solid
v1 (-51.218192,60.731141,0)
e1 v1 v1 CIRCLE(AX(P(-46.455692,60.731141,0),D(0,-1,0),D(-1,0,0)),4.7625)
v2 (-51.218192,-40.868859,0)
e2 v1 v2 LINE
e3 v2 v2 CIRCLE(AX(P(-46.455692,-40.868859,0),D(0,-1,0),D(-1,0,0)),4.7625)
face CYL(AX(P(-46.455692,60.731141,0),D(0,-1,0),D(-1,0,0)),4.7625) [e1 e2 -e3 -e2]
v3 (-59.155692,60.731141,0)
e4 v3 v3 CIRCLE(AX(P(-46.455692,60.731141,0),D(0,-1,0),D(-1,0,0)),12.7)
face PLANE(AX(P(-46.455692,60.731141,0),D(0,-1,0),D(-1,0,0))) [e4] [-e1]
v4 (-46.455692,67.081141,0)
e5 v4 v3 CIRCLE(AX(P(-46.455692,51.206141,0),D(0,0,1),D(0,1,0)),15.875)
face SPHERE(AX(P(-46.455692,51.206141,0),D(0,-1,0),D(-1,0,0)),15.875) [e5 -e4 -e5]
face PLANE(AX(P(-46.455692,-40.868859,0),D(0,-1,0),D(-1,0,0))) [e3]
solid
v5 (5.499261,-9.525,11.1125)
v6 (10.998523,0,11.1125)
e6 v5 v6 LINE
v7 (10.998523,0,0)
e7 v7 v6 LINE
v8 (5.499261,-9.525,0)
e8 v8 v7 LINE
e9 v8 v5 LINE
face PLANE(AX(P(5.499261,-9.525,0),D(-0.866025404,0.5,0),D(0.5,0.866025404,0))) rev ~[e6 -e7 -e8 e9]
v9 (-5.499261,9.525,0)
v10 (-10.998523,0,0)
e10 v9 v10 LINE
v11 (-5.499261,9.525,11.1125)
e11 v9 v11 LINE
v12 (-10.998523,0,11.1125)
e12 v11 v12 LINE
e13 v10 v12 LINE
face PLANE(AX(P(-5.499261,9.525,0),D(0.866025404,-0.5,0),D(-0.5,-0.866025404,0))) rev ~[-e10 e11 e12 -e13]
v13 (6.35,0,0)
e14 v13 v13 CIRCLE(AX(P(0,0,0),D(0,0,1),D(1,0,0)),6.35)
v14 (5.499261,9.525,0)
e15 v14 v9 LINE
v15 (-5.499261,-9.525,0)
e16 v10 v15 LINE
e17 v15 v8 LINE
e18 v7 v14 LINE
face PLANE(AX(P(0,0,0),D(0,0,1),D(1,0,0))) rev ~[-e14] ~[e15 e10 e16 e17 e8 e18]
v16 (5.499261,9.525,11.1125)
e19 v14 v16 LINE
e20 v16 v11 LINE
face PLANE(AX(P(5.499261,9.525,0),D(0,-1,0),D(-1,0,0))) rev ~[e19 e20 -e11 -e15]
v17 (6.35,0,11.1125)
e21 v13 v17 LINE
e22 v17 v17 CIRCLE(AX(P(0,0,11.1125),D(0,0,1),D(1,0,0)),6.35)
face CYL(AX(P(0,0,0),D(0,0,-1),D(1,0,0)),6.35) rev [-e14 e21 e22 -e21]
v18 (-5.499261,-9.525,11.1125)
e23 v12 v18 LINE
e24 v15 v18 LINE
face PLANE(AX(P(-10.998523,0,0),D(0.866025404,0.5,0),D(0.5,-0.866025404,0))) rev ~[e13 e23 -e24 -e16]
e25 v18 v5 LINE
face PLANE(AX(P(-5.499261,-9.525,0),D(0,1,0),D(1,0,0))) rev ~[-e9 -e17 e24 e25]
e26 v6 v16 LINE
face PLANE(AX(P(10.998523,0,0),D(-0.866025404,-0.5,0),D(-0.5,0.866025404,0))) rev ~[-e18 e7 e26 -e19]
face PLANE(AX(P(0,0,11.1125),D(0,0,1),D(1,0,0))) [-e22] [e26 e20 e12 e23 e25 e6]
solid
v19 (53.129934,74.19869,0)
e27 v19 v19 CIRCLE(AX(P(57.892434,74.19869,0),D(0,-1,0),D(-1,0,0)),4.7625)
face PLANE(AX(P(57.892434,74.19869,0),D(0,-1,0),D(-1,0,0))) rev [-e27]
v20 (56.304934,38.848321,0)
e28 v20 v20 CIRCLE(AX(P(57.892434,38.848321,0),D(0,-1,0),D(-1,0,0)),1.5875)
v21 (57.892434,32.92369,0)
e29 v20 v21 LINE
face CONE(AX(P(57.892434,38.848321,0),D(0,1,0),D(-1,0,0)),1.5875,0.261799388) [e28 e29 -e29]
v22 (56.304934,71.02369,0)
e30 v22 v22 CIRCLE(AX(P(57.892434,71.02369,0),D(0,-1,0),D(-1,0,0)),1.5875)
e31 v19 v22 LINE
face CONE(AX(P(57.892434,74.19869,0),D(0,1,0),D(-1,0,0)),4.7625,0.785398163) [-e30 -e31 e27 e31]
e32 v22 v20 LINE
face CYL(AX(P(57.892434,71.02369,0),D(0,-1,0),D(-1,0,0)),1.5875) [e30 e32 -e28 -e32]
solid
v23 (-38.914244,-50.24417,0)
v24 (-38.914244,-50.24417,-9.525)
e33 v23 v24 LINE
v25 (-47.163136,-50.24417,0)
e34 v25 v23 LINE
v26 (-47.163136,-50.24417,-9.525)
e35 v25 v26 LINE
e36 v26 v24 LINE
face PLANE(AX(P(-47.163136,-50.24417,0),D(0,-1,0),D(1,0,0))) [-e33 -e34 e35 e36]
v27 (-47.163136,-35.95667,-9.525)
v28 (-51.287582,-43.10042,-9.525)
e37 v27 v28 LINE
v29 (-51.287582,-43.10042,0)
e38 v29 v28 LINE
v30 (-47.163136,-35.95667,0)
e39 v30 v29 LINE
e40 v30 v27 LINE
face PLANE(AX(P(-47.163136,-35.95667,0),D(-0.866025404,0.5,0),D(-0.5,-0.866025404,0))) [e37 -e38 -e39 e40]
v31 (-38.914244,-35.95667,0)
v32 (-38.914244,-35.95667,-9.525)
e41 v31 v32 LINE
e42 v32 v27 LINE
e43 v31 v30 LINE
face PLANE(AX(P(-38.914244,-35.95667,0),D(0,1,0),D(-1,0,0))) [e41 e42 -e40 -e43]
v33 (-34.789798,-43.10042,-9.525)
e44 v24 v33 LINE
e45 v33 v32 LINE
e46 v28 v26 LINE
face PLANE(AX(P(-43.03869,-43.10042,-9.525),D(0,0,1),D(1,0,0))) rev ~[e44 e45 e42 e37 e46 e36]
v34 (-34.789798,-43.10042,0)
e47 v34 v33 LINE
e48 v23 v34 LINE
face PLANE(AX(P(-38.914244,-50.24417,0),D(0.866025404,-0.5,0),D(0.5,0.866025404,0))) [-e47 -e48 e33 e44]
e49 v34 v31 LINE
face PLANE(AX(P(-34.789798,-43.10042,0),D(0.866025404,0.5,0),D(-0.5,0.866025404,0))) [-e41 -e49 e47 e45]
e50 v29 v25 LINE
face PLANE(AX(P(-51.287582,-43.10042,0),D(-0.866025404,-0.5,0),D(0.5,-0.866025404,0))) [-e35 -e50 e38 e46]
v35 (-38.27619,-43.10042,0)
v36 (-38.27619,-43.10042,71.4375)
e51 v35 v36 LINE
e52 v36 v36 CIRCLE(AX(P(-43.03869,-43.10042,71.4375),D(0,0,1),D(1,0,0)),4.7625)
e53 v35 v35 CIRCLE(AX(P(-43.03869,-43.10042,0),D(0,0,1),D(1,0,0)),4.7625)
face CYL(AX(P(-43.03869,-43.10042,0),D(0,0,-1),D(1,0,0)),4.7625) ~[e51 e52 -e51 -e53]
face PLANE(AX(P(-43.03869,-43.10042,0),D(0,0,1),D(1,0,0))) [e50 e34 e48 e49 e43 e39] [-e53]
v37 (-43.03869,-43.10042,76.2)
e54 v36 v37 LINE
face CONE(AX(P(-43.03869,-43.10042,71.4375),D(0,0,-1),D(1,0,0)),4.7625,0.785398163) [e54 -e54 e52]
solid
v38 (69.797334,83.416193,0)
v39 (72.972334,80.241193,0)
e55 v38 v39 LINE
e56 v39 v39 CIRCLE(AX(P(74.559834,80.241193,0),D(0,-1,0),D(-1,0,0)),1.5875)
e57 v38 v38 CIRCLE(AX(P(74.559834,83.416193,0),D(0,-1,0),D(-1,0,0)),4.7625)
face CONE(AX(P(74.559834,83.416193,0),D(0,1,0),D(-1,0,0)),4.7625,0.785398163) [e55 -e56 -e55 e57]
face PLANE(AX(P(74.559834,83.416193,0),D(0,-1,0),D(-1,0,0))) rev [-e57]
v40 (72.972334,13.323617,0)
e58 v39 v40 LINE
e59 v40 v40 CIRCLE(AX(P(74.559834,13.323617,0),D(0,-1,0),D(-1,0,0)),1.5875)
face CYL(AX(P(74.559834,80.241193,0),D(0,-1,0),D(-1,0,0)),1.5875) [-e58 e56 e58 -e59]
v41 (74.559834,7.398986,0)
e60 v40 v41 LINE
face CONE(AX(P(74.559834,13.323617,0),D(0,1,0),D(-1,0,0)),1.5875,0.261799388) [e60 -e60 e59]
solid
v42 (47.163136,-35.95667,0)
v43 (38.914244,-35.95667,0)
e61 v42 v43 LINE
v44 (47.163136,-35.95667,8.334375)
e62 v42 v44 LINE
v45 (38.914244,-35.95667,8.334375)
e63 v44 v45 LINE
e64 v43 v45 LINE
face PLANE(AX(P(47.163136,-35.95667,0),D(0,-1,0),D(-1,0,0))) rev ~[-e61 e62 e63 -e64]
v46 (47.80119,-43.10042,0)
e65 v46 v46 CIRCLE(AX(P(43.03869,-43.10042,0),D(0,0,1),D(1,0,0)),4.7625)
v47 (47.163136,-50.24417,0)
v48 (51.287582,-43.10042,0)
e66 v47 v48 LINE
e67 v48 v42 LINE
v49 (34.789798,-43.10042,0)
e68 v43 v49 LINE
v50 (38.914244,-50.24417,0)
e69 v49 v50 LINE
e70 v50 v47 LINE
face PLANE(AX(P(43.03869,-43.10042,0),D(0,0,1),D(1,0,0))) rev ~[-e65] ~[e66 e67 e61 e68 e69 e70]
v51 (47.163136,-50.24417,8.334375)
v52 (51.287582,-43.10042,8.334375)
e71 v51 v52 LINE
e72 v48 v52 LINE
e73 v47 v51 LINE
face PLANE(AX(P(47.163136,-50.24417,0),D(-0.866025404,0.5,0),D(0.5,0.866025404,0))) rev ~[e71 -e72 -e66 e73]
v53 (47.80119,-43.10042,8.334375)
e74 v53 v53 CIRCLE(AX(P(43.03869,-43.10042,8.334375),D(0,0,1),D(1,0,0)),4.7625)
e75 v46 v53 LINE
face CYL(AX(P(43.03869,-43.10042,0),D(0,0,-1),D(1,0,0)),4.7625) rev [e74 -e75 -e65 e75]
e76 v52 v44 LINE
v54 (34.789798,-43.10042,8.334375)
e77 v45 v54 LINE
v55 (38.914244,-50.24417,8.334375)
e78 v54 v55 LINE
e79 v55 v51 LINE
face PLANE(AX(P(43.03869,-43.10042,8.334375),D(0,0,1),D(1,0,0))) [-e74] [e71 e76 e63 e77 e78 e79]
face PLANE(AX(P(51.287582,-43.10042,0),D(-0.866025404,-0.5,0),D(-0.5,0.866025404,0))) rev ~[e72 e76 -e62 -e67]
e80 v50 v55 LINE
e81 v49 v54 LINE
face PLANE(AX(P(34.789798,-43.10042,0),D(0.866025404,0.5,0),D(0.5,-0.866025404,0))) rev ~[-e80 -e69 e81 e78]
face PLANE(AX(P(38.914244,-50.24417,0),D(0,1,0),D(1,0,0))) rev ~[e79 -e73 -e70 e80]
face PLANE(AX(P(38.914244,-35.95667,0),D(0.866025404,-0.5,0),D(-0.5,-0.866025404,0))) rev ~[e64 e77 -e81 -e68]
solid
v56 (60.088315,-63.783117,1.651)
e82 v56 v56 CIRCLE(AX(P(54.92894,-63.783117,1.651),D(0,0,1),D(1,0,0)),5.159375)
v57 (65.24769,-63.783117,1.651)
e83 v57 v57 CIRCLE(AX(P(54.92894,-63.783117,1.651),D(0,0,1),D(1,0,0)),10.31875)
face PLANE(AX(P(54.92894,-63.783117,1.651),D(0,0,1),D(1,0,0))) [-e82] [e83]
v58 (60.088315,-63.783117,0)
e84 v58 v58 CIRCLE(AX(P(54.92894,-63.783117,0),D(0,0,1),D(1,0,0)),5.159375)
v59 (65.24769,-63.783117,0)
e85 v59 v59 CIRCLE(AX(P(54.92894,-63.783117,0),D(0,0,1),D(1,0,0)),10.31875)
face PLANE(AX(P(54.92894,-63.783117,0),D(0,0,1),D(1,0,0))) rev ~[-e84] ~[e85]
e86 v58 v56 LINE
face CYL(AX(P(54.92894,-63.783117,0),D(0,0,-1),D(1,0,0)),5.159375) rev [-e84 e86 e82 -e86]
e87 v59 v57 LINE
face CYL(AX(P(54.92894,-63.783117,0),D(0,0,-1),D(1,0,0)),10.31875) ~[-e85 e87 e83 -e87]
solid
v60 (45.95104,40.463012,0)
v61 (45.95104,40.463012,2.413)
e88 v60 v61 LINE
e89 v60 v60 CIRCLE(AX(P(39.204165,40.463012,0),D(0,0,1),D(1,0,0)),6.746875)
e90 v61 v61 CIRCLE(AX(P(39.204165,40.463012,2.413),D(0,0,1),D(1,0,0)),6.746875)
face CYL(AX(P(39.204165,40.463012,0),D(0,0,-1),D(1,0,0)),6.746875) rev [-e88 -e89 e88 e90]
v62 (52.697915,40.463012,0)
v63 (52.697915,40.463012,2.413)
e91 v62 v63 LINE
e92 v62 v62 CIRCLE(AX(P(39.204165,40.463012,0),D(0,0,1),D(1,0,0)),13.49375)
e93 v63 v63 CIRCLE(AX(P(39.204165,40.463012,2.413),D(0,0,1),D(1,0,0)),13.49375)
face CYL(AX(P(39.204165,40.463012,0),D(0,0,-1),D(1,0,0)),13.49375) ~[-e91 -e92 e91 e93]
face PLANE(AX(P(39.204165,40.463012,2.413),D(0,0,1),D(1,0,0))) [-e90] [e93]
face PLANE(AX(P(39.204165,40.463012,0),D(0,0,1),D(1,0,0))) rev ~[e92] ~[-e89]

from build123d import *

# Parameters (mm, degrees)
F0_R      = 6.35
F1_DEPTH  = 11.1125
F2_R      = 13.49375
F2_R_2    = 6.746875
F3_DEPTH  = 2.413
F6_R      = 4.7625
F7_DEPTH  = 8.334375
F8_R      = 10.31875
F8_R_2    = 5.159375
F9_DEPTH  = 1.651
F14_DEPTH = 9.525
F15_DEPTH = 76.2
F16_SIZE  = 4.7625


# Not quite as in the source:
# - a length typed as a fraction of an inch, garbled in the dataset ("3 / 203.2 mm" for 3/8 in), is restored


with BuildPart() as f1:
    # F0 (on Top) → F1 (new body)
    with BuildSketch(Plane.XY):
        Polygon((5.499261314, 9.525), (-5.499261314, 9.525), (-10.9985226281, 0), (-5.499261314, -9.525), (5.499261314, -9.525), (10.9985226281, 0), align=None)
        Circle(F0_R, mode=Mode.SUBTRACT)
    extrude(amount=F1_DEPTH)


with BuildPart() as f3:
    # F2 (on Top) → F3 (new body)
    with BuildSketch(Plane.XY):
        with Locations((39.2041653395, 40.4630117118)):
            Circle(F2_R)
        with Locations((39.2041653395, 40.4630117118)):
            Circle(F2_R_2, mode=Mode.SUBTRACT)
    extrude(amount=F3_DEPTH)


with BuildPart() as f5:
    # F4 (on Top) → F5 (revolve)
    with BuildSketch(Plane.XY):
        with BuildLine():
            Line((-46.4556922868, -40.868859118), (-46.4556922868, 60.731140882))
            Line((-46.4556922868, 60.731140882), (-46.4556922868, 67.081140882))
            ThreePointArc((-46.4556922868, 67.081140882), (-53.5552081154, 65.4051725392), (-59.1556922868, 60.731140882))
            Line((-59.1556922868, 60.731140882), (-51.2181922868, 60.731140882))
            Line((-51.2181922868, 60.731140882), (-51.2181922868, -40.868859118))
            Line((-51.2181922868, -40.868859118), (-46.4556922868, -40.868859118))
        make_face()
    revolve(axis=Axis((-46.4556922868, 9.931140882, 0), (0, -1, 0)))


with BuildPart() as f7:
    # F6 (on Top) → F7 (new body)
    with BuildSketch(Plane.XY):
        Polygon((47.1631364482, -35.9566703924), (38.9142444772, -35.9566703924), (34.7897984917, -43.1004203924), (38.9142444772, -50.2441703924), (47.1631364482, -50.2441703924), (51.2875824338, -43.1004203924), align=None)
        with Locations((43.0386904627, -43.1004203924)):
            Circle(F6_R, mode=Mode.SUBTRACT)
    extrude(amount=F7_DEPTH)


with BuildPart() as f9:
    # F8 (on Top) → F9 (new body)
    with BuildSketch(Plane.XY):
        with Locations((54.9289397895, -63.7831166387)):
            Circle(F8_R)
        with Locations((54.9289397895, -63.7831166387)):
            Circle(F8_R_2, mode=Mode.SUBTRACT)
    extrude(amount=F9_DEPTH)


with BuildPart() as f11:
    # F10 (on Top) → F11 (revolve)
    with BuildSketch(Plane.XY):
        Polygon((57.8924338935, 74.1986898454), (53.1299338935, 74.1986898454), (56.3049338935, 71.0236898454), (56.3049338935, 38.8483205024), (57.8924338935, 32.9236898454), align=None)
    revolve(axis=Axis((57.8924338935, 53.5611898454, 0), (0, -1, 0)))


with BuildPart() as f13:
    # F12 (on Top) → F13 (revolve)
    with BuildSketch(Plane.XY):
        Polygon((74.5598336721, 83.4161932281), (69.7973336721, 83.4161932281), (72.9723336721, 80.2411932281), (72.9723336721, 13.3236167875), (74.5598336721, 7.3989861305), align=None)
    revolve(axis=Axis((74.5598336721, 45.4075896793, 0), (0, -1, 0)))


with BuildPart() as f14:
    # F6 (on Top) → F14 (new body)
    with BuildSketch(Plane.XY):
        Polygon((-34.7897984917, -43.1004203924), (-38.9142444772, -35.9566703924), (-47.1631364482, -35.9566703924), (-51.2875824338, -43.1004203924), (-47.1631364482, -50.2441703924), (-38.9142444772, -50.2441703924), align=None)
        with Locations((-43.0386904627, -43.1004203924)):
            Circle(F6_R, mode=Mode.SUBTRACT)
        with Locations((-43.0386904627, -43.1004203924)):
            Circle(F6_R)
    extrude(amount=-F14_DEPTH)

    # F6 (on Top) → F15 (join)
    with BuildSketch(Plane.XY):
        with Locations((-43.0386904627, -43.1004203924)):
            Circle(F6_R)
    extrude(amount=F15_DEPTH)

    # F16
    f16_edges = [f14.edges().sort_by_distance(p)[0] for p in [
        (-47.80119, -43.10042, 76.2),
    ]]
    chamfer(f16_edges, length=F16_SIZE)


solid = Compound([f1.part, f3.part, f5.part, f7.part, f9.part, f11.part, f13.part, f14.part])
